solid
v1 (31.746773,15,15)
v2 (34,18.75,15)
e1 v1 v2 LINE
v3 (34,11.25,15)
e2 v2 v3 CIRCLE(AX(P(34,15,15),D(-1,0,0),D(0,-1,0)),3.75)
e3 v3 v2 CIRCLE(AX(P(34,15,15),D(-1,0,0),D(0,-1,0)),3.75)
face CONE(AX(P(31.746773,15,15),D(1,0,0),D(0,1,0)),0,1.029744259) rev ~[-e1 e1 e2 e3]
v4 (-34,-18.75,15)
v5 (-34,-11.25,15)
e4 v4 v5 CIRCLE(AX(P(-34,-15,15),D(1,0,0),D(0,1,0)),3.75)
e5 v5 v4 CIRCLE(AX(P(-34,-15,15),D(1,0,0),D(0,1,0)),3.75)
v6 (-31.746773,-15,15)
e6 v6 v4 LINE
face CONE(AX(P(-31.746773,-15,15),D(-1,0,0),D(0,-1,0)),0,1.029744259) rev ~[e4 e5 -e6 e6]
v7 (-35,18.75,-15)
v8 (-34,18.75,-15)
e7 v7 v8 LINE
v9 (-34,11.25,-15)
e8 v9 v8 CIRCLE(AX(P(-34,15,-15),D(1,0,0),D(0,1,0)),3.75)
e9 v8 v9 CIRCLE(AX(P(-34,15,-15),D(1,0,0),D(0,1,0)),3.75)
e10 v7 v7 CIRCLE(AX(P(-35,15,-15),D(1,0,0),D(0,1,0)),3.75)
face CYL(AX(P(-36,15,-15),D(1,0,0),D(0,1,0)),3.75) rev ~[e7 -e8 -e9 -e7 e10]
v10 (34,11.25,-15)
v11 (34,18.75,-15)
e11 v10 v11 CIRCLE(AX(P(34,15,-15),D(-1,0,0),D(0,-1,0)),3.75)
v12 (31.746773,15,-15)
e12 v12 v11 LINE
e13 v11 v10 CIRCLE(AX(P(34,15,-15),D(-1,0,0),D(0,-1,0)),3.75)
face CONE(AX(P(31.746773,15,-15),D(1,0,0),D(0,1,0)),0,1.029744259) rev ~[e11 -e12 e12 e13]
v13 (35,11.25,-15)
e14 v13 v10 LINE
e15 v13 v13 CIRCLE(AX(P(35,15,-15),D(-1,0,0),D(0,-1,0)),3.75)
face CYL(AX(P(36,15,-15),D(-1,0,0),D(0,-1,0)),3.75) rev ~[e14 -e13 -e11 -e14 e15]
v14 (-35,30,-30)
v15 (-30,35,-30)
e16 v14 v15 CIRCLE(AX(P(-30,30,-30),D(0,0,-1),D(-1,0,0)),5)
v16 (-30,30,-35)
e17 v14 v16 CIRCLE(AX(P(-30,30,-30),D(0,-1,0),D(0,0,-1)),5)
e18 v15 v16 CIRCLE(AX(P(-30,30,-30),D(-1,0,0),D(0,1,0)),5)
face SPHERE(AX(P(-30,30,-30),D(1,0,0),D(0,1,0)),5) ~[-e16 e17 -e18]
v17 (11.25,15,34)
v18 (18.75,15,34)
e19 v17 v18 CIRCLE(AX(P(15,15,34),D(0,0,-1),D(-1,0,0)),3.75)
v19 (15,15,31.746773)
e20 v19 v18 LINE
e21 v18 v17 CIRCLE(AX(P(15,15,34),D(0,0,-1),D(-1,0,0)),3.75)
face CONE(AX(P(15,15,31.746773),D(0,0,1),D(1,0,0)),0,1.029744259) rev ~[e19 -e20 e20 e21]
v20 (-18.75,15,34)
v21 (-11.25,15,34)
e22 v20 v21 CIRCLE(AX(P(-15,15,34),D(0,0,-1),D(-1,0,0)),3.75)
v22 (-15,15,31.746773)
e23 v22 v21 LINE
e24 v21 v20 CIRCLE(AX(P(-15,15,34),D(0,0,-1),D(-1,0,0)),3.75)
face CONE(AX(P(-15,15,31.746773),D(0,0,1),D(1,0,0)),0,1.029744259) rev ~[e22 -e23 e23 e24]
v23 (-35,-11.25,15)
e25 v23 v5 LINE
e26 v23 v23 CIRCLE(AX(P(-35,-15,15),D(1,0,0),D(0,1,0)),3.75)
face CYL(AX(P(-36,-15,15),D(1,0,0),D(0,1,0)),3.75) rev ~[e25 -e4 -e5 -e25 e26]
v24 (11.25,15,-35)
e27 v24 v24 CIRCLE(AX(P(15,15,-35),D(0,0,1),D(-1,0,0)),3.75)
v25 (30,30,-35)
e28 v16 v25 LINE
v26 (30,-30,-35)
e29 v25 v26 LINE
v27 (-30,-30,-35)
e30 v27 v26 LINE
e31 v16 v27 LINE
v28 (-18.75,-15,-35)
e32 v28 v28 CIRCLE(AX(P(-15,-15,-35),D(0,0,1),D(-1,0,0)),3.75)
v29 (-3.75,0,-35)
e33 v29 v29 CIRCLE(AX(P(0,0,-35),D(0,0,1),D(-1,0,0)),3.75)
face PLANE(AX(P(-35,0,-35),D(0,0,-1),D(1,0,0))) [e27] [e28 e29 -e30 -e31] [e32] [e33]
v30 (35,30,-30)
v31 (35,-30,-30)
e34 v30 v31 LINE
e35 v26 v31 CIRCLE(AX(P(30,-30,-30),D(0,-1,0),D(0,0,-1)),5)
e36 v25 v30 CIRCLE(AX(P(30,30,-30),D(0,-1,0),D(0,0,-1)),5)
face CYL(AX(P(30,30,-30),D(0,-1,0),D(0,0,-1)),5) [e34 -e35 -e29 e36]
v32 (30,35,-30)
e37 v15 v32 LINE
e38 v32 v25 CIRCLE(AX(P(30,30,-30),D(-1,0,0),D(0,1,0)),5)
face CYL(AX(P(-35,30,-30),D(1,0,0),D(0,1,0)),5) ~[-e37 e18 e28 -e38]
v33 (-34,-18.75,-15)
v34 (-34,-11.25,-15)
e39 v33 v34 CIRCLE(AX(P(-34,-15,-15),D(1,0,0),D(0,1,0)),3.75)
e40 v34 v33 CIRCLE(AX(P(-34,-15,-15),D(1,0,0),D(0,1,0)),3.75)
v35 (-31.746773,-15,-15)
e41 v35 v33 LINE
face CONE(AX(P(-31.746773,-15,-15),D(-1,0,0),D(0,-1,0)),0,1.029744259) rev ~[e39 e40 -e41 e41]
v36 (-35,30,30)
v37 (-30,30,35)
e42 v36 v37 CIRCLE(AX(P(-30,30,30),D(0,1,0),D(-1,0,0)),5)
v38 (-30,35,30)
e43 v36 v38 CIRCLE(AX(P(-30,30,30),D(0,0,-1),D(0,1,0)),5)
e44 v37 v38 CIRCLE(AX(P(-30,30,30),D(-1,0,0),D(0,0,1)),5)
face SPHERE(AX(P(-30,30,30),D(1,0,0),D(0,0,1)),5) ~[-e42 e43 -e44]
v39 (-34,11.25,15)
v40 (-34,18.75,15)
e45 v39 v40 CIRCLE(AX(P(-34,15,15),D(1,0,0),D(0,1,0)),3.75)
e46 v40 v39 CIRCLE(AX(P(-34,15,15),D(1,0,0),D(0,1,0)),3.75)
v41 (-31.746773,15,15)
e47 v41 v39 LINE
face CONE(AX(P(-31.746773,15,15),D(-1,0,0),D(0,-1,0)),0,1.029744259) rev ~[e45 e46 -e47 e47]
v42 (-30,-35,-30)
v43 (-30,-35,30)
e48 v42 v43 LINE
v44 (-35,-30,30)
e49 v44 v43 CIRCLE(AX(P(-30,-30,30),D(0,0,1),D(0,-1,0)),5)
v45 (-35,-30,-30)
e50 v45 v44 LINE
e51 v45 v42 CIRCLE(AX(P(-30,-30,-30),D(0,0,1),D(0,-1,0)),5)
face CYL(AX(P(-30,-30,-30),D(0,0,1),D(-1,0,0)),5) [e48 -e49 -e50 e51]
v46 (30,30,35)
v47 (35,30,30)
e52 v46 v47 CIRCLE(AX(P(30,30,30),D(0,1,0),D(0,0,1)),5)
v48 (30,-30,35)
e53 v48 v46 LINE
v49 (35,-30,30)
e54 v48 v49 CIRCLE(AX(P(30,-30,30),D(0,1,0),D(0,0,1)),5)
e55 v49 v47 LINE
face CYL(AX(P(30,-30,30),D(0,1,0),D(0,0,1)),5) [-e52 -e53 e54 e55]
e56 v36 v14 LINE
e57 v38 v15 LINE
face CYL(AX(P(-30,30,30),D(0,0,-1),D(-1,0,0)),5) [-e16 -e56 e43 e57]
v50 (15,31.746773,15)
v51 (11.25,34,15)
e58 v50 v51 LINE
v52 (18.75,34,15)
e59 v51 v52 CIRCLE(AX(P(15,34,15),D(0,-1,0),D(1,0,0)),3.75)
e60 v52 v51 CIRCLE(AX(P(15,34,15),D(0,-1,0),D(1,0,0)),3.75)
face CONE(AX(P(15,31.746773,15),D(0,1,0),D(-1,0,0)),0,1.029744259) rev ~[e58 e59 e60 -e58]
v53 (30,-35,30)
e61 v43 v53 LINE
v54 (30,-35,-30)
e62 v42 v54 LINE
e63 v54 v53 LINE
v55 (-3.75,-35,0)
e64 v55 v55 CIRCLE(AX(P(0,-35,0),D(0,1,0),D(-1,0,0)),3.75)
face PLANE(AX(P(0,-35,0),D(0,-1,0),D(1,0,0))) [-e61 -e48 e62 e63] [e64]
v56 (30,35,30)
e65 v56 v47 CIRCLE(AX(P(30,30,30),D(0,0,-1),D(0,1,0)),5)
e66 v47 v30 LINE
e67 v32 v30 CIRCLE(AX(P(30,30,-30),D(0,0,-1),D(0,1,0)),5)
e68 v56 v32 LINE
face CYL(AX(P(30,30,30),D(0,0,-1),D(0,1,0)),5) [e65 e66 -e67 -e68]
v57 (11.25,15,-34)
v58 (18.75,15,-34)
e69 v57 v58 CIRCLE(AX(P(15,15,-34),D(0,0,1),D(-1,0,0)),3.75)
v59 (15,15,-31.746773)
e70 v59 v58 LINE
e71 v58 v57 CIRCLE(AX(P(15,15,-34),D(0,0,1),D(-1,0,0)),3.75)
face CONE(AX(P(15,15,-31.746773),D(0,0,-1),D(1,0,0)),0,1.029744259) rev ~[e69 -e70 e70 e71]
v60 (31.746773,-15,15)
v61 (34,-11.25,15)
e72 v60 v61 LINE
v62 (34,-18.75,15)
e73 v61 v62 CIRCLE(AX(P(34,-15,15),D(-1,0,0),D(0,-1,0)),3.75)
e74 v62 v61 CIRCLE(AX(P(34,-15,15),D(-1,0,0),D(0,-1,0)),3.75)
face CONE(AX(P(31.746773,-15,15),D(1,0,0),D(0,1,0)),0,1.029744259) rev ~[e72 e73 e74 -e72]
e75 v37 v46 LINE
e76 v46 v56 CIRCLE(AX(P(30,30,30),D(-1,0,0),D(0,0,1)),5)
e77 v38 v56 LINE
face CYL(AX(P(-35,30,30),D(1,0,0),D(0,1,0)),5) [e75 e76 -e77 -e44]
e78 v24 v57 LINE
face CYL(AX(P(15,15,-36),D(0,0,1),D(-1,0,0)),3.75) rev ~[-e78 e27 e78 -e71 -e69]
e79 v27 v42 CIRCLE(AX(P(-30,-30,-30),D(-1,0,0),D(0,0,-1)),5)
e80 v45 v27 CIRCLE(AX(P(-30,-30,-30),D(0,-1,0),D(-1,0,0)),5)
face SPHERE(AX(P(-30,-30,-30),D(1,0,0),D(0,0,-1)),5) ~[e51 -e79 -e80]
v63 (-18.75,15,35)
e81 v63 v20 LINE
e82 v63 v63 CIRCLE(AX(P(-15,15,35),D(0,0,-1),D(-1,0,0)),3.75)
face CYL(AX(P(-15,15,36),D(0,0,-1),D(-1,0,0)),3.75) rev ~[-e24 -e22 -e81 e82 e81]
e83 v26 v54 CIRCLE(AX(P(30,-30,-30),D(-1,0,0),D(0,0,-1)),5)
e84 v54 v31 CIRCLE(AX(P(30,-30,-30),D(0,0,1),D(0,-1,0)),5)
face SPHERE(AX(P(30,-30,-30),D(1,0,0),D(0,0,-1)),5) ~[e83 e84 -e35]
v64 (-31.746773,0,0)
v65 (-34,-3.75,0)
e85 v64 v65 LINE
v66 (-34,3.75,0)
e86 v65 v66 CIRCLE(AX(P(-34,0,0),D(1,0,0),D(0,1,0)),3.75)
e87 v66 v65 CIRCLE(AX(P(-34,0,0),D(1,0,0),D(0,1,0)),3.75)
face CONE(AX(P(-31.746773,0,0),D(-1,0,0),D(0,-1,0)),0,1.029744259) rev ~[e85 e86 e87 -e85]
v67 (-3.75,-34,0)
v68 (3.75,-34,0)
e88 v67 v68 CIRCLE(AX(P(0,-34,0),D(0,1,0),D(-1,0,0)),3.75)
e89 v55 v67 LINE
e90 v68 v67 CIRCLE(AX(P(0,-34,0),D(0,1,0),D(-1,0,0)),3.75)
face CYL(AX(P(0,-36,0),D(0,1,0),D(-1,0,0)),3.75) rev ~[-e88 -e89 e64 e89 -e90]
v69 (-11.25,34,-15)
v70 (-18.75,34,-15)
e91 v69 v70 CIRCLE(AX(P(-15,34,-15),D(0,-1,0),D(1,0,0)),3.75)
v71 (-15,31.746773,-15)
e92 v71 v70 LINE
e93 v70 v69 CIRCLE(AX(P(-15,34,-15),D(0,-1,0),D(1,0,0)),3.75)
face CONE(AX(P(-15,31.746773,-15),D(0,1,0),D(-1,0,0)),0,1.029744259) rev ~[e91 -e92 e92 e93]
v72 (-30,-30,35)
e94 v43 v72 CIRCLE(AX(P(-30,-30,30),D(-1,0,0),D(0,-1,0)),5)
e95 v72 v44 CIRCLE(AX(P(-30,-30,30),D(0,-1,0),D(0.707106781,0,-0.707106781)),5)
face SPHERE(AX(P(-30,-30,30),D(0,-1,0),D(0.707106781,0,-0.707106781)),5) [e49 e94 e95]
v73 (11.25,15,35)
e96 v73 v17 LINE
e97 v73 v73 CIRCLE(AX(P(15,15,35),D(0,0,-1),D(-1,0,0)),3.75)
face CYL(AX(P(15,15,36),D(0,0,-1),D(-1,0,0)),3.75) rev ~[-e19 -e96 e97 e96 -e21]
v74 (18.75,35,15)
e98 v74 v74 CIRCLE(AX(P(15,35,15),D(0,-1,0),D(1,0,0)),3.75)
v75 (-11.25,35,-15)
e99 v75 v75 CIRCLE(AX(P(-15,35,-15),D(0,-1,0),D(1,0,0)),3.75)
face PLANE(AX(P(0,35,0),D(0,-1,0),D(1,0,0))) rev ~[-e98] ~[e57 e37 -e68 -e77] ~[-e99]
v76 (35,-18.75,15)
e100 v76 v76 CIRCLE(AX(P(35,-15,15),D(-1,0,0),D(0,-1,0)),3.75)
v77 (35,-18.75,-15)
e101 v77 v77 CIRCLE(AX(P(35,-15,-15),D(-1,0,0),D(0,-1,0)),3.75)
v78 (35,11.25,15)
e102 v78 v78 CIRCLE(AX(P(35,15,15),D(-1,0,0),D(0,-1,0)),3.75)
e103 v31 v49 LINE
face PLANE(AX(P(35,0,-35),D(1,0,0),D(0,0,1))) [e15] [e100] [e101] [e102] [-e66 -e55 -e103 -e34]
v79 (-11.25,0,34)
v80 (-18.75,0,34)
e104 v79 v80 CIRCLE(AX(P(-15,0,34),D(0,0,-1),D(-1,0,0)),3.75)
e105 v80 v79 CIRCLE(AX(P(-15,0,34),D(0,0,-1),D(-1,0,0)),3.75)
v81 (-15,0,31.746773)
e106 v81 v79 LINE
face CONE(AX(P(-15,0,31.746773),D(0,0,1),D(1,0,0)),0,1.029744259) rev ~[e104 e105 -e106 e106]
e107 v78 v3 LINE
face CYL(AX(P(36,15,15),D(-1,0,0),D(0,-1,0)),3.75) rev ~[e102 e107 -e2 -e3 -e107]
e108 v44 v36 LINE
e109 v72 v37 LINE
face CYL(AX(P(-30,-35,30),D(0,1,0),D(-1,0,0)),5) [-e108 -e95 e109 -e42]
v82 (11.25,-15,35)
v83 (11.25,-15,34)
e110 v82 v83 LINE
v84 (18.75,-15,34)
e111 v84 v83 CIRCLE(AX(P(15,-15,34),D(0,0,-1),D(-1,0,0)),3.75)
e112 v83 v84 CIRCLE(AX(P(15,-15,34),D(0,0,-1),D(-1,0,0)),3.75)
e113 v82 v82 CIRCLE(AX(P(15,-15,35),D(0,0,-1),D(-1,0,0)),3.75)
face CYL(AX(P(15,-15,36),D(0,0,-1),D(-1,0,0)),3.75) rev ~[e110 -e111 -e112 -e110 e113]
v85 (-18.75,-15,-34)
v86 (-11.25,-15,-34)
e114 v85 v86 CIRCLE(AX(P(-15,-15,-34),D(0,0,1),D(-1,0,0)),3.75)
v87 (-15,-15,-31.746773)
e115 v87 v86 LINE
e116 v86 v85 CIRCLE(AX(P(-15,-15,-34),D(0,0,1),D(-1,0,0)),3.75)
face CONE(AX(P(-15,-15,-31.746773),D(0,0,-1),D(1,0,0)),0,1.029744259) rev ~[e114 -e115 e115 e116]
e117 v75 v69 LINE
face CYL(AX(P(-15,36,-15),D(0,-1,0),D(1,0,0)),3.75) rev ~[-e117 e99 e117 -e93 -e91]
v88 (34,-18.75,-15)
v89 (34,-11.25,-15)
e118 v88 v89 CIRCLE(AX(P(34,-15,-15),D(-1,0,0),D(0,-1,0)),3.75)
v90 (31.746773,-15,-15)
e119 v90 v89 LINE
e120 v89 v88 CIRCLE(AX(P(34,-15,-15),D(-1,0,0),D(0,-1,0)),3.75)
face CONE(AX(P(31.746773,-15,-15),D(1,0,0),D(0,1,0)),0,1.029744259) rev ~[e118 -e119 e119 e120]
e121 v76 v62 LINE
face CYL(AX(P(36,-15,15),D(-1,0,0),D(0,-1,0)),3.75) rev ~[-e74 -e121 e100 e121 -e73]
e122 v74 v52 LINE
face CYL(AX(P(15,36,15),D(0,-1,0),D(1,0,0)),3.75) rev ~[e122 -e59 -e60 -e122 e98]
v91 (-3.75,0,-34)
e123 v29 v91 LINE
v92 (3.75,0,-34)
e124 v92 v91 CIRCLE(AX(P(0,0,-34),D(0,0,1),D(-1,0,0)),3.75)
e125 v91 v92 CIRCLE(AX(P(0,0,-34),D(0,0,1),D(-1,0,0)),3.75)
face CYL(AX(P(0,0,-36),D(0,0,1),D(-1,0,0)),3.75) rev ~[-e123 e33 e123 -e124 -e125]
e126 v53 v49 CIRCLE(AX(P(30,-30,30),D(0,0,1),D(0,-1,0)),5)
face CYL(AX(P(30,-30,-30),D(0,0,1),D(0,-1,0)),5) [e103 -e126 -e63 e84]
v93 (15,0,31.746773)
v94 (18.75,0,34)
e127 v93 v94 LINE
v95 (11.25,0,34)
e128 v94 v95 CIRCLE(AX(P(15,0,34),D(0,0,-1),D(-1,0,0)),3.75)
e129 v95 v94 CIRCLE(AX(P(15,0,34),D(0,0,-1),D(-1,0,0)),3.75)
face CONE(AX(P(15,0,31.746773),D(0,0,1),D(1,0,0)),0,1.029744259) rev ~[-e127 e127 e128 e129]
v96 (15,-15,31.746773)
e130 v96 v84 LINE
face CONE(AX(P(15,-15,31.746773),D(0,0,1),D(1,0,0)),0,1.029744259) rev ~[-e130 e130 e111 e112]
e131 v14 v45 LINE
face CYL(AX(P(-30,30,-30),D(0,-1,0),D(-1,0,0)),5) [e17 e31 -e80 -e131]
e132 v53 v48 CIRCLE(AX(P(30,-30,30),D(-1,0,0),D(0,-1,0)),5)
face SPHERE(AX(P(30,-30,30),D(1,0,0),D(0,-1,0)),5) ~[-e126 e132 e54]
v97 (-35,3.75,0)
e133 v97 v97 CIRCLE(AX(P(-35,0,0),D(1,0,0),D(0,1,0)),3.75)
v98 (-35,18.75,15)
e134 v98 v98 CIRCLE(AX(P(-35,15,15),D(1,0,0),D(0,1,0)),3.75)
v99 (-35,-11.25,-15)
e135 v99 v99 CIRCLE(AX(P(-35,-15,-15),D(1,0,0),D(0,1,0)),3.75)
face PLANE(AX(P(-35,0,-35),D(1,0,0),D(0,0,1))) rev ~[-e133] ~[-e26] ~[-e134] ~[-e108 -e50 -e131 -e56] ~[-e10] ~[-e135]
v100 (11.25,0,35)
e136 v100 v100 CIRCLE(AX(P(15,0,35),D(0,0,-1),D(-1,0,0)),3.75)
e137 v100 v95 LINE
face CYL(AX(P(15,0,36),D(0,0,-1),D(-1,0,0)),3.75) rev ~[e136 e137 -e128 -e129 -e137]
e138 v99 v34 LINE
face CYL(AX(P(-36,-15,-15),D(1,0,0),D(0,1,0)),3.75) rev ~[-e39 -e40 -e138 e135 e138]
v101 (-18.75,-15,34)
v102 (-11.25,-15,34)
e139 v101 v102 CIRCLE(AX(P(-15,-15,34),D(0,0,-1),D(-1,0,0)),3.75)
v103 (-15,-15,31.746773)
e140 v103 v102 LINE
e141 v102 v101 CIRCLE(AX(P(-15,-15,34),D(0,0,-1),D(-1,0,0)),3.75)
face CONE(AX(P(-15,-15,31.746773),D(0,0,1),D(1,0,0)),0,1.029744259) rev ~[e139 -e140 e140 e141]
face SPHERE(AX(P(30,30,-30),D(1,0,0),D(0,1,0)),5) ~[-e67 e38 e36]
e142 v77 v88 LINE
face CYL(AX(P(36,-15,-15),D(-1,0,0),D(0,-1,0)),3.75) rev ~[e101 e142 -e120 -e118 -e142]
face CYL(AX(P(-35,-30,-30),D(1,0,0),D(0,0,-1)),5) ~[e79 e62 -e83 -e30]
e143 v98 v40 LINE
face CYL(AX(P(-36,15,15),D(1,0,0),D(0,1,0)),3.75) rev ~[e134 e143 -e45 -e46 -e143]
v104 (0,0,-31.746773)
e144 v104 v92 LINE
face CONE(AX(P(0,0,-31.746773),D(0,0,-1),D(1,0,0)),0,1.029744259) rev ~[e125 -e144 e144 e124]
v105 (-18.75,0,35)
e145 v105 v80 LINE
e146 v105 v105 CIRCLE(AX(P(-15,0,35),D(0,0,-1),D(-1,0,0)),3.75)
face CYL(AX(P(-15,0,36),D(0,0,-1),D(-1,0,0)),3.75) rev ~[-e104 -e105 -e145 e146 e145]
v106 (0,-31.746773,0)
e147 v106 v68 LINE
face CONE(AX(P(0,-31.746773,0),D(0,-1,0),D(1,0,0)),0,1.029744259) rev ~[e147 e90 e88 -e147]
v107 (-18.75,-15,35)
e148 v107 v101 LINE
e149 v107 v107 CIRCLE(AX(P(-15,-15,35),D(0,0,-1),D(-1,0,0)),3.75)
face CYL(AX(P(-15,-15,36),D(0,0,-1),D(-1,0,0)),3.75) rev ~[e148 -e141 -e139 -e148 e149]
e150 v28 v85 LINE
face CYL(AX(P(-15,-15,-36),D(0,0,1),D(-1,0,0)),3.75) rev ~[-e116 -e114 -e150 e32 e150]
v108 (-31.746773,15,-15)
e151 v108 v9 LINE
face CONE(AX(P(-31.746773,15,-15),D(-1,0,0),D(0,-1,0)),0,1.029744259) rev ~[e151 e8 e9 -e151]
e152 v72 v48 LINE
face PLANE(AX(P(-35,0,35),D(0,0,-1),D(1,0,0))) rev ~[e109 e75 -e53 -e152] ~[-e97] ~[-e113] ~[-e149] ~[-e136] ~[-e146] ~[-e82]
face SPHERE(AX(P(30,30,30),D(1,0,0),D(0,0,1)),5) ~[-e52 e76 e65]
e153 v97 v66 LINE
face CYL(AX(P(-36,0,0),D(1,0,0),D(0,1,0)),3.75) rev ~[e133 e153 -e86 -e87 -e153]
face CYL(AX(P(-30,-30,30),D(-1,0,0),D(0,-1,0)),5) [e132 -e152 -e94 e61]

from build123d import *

# Parameters (mm, degrees)
F0_W        = 70
F0_H        = 70
F1_DEPTH    = 35
F2_R        = 5
F3_R        = 5
F4_R        = 5
F5_R        = 5
F6_T1_DEPTH = 77.5
F6_S5_W     = 5
F6_S5_H     = 5
F6_T6_DEPTH = 5
F7_R        = 5
F9_D        = 7.5
F9_DEPTH    = 1
F9_TIP      = 2.2532273214
F11_D       = 7.5
F11_DEPTH   = 1
F11_TIP     = 2.2532273214
F13_D       = 7.5
F13_DEPTH   = 1
F13_TIP     = 2.2532273214
F15_D       = 7.5
F15_DEPTH   = 1
F15_TIP     = 2.2532273214
F17_D       = 7.5
F17_DEPTH   = 1
F17_TIP     = 2.2532273214
F19_D       = 7.5
F19_DEPTH   = 1
F19_TIP     = 2.2532273214


# Not quite as in the source:
# - a fillet or chamfer that OpenCascade refuses, or shapes differently, is made with other operations: its cross-section is extruded or revolved along the edge and cut away or added


with BuildPart() as f1:
    # F0 (on Front) → F1 (new body, symmetric)
    with BuildSketch(Plane.XZ):
        Rectangle(F0_W, F0_H)
    extrude(amount=F1_DEPTH, both=True)

    # F2
    f2_edges = [f1.edges().sort_by_distance(p)[0] for p in [
        (0, 35, -35),
    ]]
    fillet(f2_edges, radius=F2_R)

    # F3
    f3_edges = [f1.edges().sort_by_distance(p)[0] for p in [
        (0, 35, 35),
    ]]
    fillet(f3_edges, radius=F3_R)

    # F4
    f4_edges = [f1.edges().sort_by_distance(p)[0] for p in [
        (0, -35, -35),
    ]]
    fillet(f4_edges, radius=F4_R)

    # F5
    f5_edges = [f1.edges().sort_by_distance(p)[0] for p in [
        (-35, -2.5, 35),
    ]]
    fillet(f5_edges, radius=F5_R)

    # F6: fillet of radius 5 on 1 edges, made by hand

    # F6_s2 → F6_t1 (cut)
    with BuildSketch(Plane.YZ.offset(-30)):
        with BuildLine():
            ThreePointArc((-35, 30), (-33.5355339059, 33.5355339059), (-30, 35))
            Line((-30, 35), (-35, 35))
            Line((-35, 35), (-35, 30))
        make_face()
    extrude(amount=F6_T1_DEPTH, mode=Mode.SUBTRACT)


with BuildPart() as f6_tool4:
    # F6_s5 → F6_t6 (new body)
    with BuildSketch(Plane.XZ.offset(30)):
        with Locations((-32.5, 32.5)):
            Rectangle(F6_S5_W, F6_S5_H)
    extrude(amount=F6_T6_DEPTH)

    # F6_s7 → F6_t8 (revolve, cut)
    with BuildSketch(Plane(origin=(-30, -30, 30), x_dir=(0.7071067812, 0, -0.7071067812), z_dir=(-0.7071067812, 0, -0.7071067812))):
        with BuildLine():
            ThreePointArc((0, -5), (5, 0), (0, 5))
            Line((0, 5), (0, -5))
        make_face()
    revolve(axis=Axis((-30, -30, 30), (0, -1, 0)), mode=Mode.SUBTRACT)


with BuildPart() as f1_1:
    add(f1.part)

    # F6_t3: cut F6_tool4
    add(f6_tool4.part, mode=Mode.SUBTRACT)

    # F7
    f7_edges = [f1_1.edges().sort_by_distance(p)[0] for p in [
        (35, 0, 35),
    ]]
    fillet(f7_edges, radius=F7_R)

    # F9
    with Locations(Plane.XZ.offset(35)):
        with Locations((0, 0)):
            Hole(F9_D / 2, depth=F9_DEPTH)
            with Locations((0, 0, -(F9_DEPTH + F9_TIP / 2))):  # 118° drill point
                Cone(0, F9_D / 2, F9_TIP, mode=Mode.SUBTRACT)

    # F11
    with Locations(Plane.YZ.offset(35)):
        with Locations((-15, 15), (15, 15), (15, -15), (-15, -15)):
            Hole(F11_D / 2, depth=F11_DEPTH)
            with Locations((0, 0, -(F11_DEPTH + F11_TIP / 2))):  # 118° drill point
                Cone(0, F11_D / 2, F11_TIP, mode=Mode.SUBTRACT)

    # F13
    with Locations(Plane.XY.offset(35)):
        with Locations((-15, 15), (15, 15), (15, 0), (15, -15), (-15, -15), (-15, 0)):
            Hole(F13_D / 2, depth=F13_DEPTH)
            with Locations((0, 0, -(F13_DEPTH + F13_TIP / 2))):  # 118° drill point
                Cone(0, F13_D / 2, F13_TIP, mode=Mode.SUBTRACT)

    # F15
    with Locations(Plane(origin=(-35, 0, 0), x_dir=(0, -1, 0), z_dir=(-1, 0, 0))):
        with Locations((-15, -15), (-15, 15), (0, 0), (15, 15), (15, -15)):
            Hole(F15_D / 2, depth=F15_DEPTH)
            with Locations((0, 0, -(F15_DEPTH + F15_TIP / 2))):  # 118° drill point
                Cone(0, F15_D / 2, F15_TIP, mode=Mode.SUBTRACT)

    # F17
    with Locations(Plane(origin=(0, 0, -35), x_dir=(1, 0, 0), z_dir=(0, 0, -1))):
        with Locations((15, -15), (0, 0), (-15, 15)):
            Hole(F17_D / 2, depth=F17_DEPTH)
            with Locations((0, 0, -(F17_DEPTH + F17_TIP / 2))):  # 118° drill point
                Cone(0, F17_D / 2, F17_TIP, mode=Mode.SUBTRACT)

    # F19
    with Locations(Plane(origin=(0, 35, 0), x_dir=(-1, 0, 0), z_dir=(0, 1, 0))):
        with Locations((-15, 15), (15, -15)):
            Hole(F19_D / 2, depth=F19_DEPTH)
            with Locations((0, 0, -(F19_DEPTH + F19_TIP / 2))):  # 118° drill point
                Cone(0, F19_D / 2, F19_TIP, mode=Mode.SUBTRACT)


solid = f1_1.part
